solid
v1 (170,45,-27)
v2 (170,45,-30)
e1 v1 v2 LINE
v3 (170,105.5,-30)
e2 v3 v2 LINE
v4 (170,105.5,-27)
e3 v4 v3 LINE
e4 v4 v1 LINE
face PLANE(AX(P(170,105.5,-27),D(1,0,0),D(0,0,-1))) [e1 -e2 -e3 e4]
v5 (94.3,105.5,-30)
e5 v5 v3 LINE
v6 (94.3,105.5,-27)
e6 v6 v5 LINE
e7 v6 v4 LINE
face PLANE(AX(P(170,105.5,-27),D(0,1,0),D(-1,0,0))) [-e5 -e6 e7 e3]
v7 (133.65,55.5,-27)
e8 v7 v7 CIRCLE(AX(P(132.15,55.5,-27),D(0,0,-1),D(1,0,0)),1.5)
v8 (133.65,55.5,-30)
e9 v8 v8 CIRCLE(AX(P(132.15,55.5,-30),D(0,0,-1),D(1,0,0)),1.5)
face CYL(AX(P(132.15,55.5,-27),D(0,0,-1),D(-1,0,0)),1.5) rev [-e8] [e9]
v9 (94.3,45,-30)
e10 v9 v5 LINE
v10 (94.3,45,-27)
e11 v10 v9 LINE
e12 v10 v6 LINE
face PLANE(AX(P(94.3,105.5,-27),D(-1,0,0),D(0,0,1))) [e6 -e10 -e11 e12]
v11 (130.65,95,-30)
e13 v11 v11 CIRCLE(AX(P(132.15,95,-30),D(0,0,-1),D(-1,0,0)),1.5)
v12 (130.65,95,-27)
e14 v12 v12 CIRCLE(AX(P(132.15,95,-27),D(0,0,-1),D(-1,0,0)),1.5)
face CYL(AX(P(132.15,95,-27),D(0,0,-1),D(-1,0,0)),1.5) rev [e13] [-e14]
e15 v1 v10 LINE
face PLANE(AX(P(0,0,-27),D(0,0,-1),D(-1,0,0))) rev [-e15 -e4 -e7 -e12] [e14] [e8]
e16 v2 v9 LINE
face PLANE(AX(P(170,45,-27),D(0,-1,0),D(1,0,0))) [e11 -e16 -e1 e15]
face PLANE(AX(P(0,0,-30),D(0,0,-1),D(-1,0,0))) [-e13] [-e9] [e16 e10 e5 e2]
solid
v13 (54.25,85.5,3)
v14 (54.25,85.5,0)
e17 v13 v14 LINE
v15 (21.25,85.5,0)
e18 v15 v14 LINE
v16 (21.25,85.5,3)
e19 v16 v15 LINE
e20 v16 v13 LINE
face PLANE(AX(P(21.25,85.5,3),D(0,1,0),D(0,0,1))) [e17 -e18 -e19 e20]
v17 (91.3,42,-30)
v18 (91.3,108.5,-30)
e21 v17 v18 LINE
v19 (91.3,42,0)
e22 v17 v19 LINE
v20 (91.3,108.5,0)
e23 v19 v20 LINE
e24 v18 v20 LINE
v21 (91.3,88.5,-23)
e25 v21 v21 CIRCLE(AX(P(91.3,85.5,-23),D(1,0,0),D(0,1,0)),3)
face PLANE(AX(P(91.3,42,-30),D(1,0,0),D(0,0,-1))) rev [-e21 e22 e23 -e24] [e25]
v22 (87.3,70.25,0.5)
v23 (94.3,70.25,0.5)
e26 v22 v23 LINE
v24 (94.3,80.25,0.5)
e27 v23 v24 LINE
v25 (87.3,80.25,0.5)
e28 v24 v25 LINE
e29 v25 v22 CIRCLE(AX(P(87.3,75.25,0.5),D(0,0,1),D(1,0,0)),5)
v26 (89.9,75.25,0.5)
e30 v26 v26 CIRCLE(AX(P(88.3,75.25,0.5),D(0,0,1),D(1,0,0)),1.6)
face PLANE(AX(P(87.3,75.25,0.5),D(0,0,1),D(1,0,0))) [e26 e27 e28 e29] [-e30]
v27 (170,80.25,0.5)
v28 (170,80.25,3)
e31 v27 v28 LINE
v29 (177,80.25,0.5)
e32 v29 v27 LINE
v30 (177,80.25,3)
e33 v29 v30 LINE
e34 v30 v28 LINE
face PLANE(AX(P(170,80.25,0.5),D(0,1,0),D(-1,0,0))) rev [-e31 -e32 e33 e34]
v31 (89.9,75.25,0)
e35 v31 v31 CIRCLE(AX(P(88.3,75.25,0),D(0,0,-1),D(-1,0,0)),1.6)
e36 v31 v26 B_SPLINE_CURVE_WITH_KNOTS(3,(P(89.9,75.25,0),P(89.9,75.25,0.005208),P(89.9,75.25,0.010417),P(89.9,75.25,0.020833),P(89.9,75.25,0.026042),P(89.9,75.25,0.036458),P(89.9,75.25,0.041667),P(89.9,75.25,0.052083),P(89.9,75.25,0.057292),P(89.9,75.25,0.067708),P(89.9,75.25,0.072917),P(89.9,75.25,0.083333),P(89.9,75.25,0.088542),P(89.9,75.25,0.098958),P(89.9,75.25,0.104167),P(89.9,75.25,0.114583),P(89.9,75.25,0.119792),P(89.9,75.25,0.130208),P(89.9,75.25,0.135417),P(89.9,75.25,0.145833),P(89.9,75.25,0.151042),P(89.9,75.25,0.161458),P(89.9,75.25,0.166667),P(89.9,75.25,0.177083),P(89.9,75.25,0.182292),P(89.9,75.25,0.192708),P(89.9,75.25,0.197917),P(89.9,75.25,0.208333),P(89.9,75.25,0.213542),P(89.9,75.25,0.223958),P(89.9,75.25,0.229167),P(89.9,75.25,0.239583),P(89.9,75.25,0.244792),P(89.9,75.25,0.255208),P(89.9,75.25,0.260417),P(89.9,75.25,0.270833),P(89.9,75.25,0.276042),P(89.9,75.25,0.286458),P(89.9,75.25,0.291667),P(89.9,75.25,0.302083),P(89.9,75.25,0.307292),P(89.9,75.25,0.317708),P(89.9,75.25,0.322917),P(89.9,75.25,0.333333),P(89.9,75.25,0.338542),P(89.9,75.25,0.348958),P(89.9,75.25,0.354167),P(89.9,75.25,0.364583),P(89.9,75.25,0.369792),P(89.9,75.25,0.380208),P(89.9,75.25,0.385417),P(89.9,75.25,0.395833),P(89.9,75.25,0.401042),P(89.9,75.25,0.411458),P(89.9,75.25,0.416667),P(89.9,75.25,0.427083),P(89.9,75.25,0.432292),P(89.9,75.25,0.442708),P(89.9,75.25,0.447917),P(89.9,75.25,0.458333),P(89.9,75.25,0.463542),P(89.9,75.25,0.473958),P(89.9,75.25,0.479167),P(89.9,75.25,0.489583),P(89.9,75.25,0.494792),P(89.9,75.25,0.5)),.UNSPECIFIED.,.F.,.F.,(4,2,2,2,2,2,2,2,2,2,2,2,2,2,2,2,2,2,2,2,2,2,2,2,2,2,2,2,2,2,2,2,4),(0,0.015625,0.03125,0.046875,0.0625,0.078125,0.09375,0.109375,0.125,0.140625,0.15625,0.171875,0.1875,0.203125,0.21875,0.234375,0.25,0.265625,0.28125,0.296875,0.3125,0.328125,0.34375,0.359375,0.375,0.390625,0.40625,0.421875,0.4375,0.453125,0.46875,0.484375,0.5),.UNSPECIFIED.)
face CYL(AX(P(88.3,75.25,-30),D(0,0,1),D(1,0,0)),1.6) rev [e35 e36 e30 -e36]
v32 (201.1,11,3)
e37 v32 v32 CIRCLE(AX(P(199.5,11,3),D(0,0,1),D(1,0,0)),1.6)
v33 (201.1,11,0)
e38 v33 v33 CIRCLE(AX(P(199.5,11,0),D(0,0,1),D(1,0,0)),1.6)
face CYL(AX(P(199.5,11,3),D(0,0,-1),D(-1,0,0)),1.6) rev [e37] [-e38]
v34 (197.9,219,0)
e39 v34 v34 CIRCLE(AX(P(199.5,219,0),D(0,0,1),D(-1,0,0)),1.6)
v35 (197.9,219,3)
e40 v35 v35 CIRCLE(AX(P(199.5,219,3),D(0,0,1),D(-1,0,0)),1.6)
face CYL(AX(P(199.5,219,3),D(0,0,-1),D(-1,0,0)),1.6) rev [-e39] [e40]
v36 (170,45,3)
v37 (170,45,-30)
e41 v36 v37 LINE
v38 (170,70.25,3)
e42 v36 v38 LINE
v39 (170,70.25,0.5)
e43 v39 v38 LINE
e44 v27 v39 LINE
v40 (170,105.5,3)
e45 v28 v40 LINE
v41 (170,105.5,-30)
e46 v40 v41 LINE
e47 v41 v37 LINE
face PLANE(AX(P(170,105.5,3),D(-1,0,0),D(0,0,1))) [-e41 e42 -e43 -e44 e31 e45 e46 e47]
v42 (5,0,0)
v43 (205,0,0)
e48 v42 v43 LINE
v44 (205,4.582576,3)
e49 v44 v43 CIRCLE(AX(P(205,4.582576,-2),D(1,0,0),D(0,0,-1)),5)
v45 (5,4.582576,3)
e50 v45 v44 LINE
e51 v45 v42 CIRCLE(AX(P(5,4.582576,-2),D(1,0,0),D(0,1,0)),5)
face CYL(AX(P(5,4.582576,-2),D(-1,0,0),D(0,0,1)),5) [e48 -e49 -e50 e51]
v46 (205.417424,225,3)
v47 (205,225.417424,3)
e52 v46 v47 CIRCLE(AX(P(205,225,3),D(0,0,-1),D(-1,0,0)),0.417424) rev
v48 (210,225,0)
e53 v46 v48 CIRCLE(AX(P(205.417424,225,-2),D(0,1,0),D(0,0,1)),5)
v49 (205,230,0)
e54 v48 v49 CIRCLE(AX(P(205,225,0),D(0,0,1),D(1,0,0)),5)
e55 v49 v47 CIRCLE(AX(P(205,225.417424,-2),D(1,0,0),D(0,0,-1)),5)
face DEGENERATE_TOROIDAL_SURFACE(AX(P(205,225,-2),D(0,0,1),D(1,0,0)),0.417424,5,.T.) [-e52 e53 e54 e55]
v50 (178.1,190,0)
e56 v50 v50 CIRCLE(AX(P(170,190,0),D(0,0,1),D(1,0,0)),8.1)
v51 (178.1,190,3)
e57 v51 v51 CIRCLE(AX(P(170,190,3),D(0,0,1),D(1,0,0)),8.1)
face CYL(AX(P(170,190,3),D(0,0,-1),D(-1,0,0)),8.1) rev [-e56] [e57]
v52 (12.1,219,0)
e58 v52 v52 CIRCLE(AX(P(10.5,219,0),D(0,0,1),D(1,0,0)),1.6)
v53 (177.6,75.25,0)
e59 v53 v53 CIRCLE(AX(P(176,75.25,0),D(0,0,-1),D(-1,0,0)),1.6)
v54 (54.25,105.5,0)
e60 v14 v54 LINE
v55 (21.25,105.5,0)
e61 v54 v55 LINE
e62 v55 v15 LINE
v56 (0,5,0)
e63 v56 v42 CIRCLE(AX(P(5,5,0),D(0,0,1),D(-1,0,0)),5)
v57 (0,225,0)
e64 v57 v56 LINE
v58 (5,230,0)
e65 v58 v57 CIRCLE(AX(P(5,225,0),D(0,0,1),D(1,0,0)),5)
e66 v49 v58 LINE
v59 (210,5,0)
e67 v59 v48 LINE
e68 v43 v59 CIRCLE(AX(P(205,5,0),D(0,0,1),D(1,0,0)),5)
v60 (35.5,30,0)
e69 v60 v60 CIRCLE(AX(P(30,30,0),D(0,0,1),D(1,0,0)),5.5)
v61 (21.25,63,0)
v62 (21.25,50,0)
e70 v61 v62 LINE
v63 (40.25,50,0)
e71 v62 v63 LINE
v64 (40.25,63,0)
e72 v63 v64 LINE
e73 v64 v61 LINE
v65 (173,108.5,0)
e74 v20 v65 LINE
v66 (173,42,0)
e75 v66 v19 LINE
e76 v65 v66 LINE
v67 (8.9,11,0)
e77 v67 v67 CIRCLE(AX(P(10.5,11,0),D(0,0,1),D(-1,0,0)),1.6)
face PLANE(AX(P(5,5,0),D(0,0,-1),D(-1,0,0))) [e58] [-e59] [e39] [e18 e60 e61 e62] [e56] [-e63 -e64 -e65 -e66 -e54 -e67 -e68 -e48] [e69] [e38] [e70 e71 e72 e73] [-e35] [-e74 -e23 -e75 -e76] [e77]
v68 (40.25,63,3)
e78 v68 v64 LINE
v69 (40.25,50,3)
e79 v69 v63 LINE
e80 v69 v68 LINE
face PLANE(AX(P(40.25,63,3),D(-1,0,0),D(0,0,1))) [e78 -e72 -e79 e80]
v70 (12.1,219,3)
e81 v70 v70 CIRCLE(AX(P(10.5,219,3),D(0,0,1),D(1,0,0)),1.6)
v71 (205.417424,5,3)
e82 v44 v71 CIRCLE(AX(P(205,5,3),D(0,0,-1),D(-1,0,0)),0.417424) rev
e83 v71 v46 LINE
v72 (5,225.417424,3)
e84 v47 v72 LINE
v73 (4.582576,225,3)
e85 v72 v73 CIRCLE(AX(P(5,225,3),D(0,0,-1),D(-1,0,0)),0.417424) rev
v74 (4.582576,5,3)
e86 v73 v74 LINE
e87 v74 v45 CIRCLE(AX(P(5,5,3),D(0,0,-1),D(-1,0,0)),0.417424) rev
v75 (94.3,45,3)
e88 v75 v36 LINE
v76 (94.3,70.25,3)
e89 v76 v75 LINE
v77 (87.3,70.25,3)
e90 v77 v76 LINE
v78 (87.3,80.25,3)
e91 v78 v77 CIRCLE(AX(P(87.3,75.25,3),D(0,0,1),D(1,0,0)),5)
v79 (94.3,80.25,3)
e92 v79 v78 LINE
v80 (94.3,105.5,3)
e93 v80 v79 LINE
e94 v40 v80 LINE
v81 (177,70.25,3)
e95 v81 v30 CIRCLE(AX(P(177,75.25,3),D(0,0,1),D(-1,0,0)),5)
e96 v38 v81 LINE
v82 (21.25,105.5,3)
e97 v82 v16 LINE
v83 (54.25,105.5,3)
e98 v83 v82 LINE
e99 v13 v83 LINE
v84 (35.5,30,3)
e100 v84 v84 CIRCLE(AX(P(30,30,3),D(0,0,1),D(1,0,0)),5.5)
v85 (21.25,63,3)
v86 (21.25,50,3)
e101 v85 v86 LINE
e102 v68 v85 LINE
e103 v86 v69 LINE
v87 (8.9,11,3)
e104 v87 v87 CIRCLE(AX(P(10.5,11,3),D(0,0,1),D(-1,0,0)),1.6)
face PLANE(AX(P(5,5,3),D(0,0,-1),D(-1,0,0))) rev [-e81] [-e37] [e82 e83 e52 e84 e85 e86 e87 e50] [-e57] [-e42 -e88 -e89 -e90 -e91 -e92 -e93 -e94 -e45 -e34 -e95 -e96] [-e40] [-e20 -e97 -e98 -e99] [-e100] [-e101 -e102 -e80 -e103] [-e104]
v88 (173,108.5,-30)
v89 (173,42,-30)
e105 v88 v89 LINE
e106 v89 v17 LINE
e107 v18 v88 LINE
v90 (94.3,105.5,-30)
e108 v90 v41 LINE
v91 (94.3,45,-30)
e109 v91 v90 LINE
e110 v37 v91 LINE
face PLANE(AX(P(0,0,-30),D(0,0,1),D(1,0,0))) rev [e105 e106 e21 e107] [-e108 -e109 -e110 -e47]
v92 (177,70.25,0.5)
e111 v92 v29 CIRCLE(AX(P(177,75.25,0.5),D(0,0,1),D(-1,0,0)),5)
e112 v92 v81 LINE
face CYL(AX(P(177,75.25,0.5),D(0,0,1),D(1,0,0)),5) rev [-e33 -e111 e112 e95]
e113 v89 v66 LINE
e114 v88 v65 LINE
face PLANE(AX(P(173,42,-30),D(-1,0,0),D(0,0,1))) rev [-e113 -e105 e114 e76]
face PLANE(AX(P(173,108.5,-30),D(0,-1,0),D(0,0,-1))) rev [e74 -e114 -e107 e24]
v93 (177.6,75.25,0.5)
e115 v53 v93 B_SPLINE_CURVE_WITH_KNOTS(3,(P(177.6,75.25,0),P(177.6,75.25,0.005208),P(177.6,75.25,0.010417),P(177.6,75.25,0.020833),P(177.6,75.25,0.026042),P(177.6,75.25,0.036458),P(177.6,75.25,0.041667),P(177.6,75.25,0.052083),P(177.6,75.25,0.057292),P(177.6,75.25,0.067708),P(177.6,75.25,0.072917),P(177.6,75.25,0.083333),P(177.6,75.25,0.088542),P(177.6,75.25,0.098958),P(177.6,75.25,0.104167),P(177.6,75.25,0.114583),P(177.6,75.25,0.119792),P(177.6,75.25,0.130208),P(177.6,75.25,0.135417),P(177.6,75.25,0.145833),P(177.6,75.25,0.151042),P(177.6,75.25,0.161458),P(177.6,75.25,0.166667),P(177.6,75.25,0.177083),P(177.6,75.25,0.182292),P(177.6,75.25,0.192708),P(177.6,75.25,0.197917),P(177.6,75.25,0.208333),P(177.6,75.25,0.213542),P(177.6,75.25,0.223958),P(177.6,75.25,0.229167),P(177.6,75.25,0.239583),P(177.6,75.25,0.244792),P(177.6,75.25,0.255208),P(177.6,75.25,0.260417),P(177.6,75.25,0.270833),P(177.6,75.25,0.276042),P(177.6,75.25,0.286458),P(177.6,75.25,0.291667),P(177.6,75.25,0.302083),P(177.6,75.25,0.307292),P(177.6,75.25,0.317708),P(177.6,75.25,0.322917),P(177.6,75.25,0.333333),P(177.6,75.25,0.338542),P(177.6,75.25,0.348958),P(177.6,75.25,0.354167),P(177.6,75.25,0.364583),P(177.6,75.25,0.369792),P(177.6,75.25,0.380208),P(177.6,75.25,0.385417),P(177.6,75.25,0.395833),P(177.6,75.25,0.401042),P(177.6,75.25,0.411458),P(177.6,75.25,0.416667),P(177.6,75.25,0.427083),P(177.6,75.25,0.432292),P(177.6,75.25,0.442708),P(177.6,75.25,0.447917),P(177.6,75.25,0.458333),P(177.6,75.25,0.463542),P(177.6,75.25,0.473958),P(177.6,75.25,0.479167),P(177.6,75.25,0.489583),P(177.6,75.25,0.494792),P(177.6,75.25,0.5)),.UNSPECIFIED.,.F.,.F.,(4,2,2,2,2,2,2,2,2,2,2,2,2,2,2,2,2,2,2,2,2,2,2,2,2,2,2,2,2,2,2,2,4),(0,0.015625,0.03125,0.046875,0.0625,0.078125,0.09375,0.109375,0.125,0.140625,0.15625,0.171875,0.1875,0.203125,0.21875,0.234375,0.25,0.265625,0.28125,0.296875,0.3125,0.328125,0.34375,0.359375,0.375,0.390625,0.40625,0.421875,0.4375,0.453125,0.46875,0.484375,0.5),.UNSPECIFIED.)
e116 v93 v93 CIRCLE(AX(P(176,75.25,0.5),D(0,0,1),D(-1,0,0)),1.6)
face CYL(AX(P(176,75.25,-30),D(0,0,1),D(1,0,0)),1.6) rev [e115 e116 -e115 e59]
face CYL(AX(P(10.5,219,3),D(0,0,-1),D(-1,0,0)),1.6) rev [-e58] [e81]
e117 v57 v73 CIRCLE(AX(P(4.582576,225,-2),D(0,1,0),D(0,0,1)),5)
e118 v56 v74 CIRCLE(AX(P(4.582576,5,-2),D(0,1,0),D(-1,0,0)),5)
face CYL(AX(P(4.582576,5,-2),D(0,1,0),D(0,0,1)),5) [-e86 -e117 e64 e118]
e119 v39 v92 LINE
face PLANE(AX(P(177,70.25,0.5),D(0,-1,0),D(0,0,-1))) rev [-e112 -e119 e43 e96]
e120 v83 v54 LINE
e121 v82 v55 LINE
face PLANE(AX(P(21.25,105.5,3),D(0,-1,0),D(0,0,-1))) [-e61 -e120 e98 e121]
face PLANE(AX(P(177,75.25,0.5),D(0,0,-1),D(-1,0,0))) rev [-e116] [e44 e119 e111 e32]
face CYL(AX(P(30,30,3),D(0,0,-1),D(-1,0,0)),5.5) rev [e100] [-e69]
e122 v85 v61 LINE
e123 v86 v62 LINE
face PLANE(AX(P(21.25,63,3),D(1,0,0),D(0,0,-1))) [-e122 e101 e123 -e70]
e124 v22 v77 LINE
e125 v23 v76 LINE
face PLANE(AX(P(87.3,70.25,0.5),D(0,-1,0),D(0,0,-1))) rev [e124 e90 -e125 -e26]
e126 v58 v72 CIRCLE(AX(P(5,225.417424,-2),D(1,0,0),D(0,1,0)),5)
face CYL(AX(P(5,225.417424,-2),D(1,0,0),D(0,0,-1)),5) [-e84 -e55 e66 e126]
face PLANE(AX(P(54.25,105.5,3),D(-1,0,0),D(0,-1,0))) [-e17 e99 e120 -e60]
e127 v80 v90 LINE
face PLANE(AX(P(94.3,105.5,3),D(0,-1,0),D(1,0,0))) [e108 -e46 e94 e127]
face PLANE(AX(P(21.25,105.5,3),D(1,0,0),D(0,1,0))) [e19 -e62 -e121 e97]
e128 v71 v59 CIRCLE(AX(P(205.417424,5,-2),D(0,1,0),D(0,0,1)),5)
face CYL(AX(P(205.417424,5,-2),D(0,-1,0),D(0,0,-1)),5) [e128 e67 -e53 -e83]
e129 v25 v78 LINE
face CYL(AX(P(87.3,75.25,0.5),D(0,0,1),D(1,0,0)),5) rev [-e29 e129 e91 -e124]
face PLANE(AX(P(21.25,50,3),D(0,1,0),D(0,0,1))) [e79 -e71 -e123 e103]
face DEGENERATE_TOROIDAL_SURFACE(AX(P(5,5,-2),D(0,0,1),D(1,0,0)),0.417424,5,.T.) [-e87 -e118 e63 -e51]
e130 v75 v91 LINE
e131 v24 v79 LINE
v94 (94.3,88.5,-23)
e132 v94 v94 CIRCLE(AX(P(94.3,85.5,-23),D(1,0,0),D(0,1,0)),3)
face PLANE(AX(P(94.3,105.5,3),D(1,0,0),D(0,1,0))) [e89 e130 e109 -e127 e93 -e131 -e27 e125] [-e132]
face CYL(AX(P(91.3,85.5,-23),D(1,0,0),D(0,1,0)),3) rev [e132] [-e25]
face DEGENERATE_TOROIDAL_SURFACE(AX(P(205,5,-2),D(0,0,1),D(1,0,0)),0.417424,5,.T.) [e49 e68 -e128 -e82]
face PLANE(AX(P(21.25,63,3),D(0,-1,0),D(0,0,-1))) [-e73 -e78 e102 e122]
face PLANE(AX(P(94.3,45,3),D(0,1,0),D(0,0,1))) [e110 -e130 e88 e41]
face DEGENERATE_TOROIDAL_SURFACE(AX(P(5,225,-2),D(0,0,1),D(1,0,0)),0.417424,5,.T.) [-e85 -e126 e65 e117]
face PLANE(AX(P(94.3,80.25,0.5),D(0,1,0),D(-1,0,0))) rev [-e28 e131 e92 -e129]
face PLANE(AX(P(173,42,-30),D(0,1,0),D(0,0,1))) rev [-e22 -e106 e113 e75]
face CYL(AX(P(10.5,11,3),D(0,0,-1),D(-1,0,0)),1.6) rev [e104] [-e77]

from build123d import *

# Parameters (mm, degrees)
SKETCH1_R           = 1.6
SKETCH1_R_2         = 8.1
SKETCH1_R_3         = 5.5
SKETCH1_W           = 19
SKETCH1_H           = 13
SKETCH1_W_2         = 75.7
SKETCH1_H_2         = 60.5
SKETCH1_W_3         = 33
SKETCH1_H_3         = 20
BOSS_EXTRUDE1_DEPTH = 3
SKETCH2_W           = 81.7
SKETCH2_H           = 66.5
SKETCH2_W_2         = 75.7
SKETCH2_H_2         = 60.5
BOSS_EXTRUDE2_DEPTH = 30
SKETCH3_W           = 75.7
SKETCH3_H           = 60.5
SKETCH3_R           = 1.5
BOSS_EXTRUDE3_DEPTH = 3
SKETCH4_R           = 3
CUT_EXTRUDE1_DEPTH  = 3
FILLET1_R           = 5
CUT_EXTRUDE2_DEPTH  = 2.5
SKETCH6_R           = 1.6
CUT_EXTRUDE3_DEPTH  = 313.938092919


with BuildPart() as part:
    # Sketch1 → Boss-Extrude1 (new body)
    with BuildSketch(Plane.XY):
        with BuildLine():
            Line((5, 0), (205, 0))
            ThreePointArc((205, 0), (208.535533906, 1.464466094), (210, 5))
            Line((210, 5), (210, 225))
            ThreePointArc((210, 225), (208.535533906, 228.535533906), (205, 230))
            Line((205, 230), (5, 230))
            ThreePointArc((5, 230), (1.464466094, 228.535533906), (0, 225))
            Line((0, 225), (0, 5))
            ThreePointArc((0, 5), (1.464466094, 1.464466094), (5, 0))
        make_face()
        with Locations((10.5, 219)):
            Circle(SKETCH1_R, mode=Mode.SUBTRACT)
        with Locations(Location((10.5, 11, 0), (0, 0, 180))):
            Circle(SKETCH1_R, mode=Mode.SUBTRACT)
        with Locations((199.5, 11)):
            Circle(SKETCH1_R, mode=Mode.SUBTRACT)
        with Locations(Location((199.5, 219, 0), (0, 0, 180))):
            Circle(SKETCH1_R, mode=Mode.SUBTRACT)
        with Locations((170, 190)):
            Circle(SKETCH1_R_2, mode=Mode.SUBTRACT)
        with Locations((30, 30)):
            Circle(SKETCH1_R_3, mode=Mode.SUBTRACT)
        with Locations((30.75, 56.5)):
            Rectangle(SKETCH1_W, SKETCH1_H, mode=Mode.SUBTRACT)
        with Locations((132.15, 75.25)):
            Rectangle(SKETCH1_W_2, SKETCH1_H_2, mode=Mode.SUBTRACT)
        with Locations((37.75, 95.5)):
            Rectangle(SKETCH1_W_3, SKETCH1_H_3, mode=Mode.SUBTRACT)
    extrude(amount=BOSS_EXTRUDE1_DEPTH)

    # Sketch2 → Boss-Extrude2 (add)
    with BuildSketch(Plane(origin=(0, 0, 0), x_dir=(-1, 0, 0), z_dir=(0, 0, -1))):
        with Locations((-132.15, 75.25)):
            Rectangle(SKETCH2_W, SKETCH2_H)
        with Locations((-132.15, 75.25)):
            Rectangle(SKETCH2_W_2, SKETCH2_H_2, mode=Mode.SUBTRACT)
    extrude(amount=BOSS_EXTRUDE2_DEPTH)

    # Sketch4 → Cut-Extrude1 (cut)
    with BuildSketch(Plane(origin=(94.3, 0, 0), x_dir=(0, 0, -1), z_dir=(1, 0, 0))):
        with Locations(Location((23, 85.5, 0), (0, 0, 90))):
            Circle(SKETCH4_R)
    extrude(amount=-CUT_EXTRUDE1_DEPTH, mode=Mode.SUBTRACT)

    # Fillet1
    # the kernel refuses this fillet: 5 mm, written as the material it takes off along each edge
    with BuildSketch(Plane(origin=(205, 225, 3), x_dir=(1, 0, 0), z_dir=(0, -1, 0))) as fillet1_piece_1:
        with BuildLine():
            CenterArc((0.417424305, -5), FILLET1_R, 23.578178478, 66.421821522)
            Line((5, -3), (5.091651514, -2.96))
            ThreePointArc((5.091651514, -2.96), (5.1, -1.5), (5.1, 0))
            Line((5.1, 0), (5, 0.1))
            Line((5, 0.1), (0.417424305, 0.1))
            Line((0.417424305, 0.1), (0.417424305, 0))
        make_face()
    revolve(axis=Axis((205, 225, 3), (0, 0, 1)), revolution_arc=90, mode=Mode.SUBTRACT)
    with BuildSketch(Plane(origin=(210, 5, 3), x_dir=(-1, 0, 0), z_dir=(0, 1, 0))) as fillet1_piece_2:
        with BuildLine():
            CenterArc((4.582575695, -5), FILLET1_R, 90, 66.421821522)
            Line((0, -3), (-0.091651514, -2.96))
            ThreePointArc((-0.091651514, -2.96), (-0.1, -1.5), (-0.1, 0))
            Line((-0.1, 0), (0, 0.1))
            Line((0, 0.1), (4.582575695, 0.1))
            Line((4.582575695, 0.1), (4.582575695, 0))
        make_face()
    extrude(amount=220, mode=Mode.SUBTRACT)
    with BuildSketch(Plane(origin=(205, 5, 3), x_dir=(0, -1, 0), z_dir=(-1, 0, 0))) as fillet1_piece_3:
        with BuildLine():
            CenterArc((0.417424305, -5), FILLET1_R, 23.578178478, 66.421821522)
            Line((5, -3), (5.091651514, -2.96))
            ThreePointArc((5.091651514, -2.96), (5.1, -1.5), (5.1, 0))
            Line((5.1, 0), (5, 0.1))
            Line((5, 0.1), (0.417424305, 0.1))
            Line((0.417424305, 0.1), (0.417424305, 0))
        make_face()
    revolve(axis=Axis((205, 5, 3), (0, 0, 1)), revolution_arc=90, mode=Mode.SUBTRACT)
    with BuildSketch(Plane(origin=(5, 0, 3), x_dir=(0, 1, 0), z_dir=(1, 0, 0)), Plane(origin=(205, 230, 3), x_dir=(0, -1, 0), z_dir=(-1, 0, 0))) as fillet1_piece_4:
        with BuildLine():
            CenterArc((4.582575695, -5), FILLET1_R, 90, 66.421821522)
            Line((0, -3), (-0.091651514, -2.96))
            ThreePointArc((-0.091651514, -2.96), (-0.1, -1.5), (-0.1, 0))
            Line((-0.1, 0), (0, 0.1))
            Line((0, 0.1), (4.582575695, 0.1))
            Line((4.582575695, 0.1), (4.582575695, 0))
        make_face()
    extrude(amount=200, mode=Mode.SUBTRACT)
    with BuildSketch(Plane(origin=(5, 5, 3), x_dir=(-1, 0, 0), z_dir=(0, 1, 0))) as fillet1_piece_5:
        with BuildLine():
            CenterArc((0.417424305, -5), FILLET1_R, 23.578178478, 66.421821522)
            Line((0.417424305, 0), (0.417424305, 0.1))
            Line((0.417424305, 0.1), (5, 0.1))
            Line((5, 0.1), (5.1, 0))
            ThreePointArc((5.1, 0), (5.1, -1.5), (5.091651514, -2.96))
            Line((5.091651514, -2.96), (5, -3))
        make_face()
    revolve(axis=Axis((5, 5, 3), (0, 0, 1)), revolution_arc=90, mode=Mode.SUBTRACT)
    with BuildSketch(Plane(origin=(0, 225, 3), x_dir=(0, 0, -1), z_dir=(0, -1, 0))) as fillet1_piece_6:
        with BuildLine():
            CenterArc((5, 4.582575695), FILLET1_R, 180, 66.421821522)
            Line((0, 4.582575695), (-0.1, 4.582575695))
            Line((-0.1, 4.582575695), (-0.1, 0))
            Line((-0.1, 0), (0, -0.1))
            ThreePointArc((0, -0.1), (1.5, -0.1), (2.96, -0.091651514))
            Line((2.96, -0.091651514), (3, 0))
        make_face()
    extrude(amount=220, mode=Mode.SUBTRACT)
    with BuildSketch(Plane(origin=(5, 225, 3), x_dir=(0, 1, 0), z_dir=(1, 0, 0))) as fillet1_piece_7:
        with BuildLine():
            CenterArc((0.417424305, -5), FILLET1_R, 23.578178478, 66.421821522)
            Line((0.417424305, 0), (0.417424305, 0.1))
            Line((0.417424305, 0.1), (5, 0.1))
            Line((5, 0.1), (5.1, 0))
            ThreePointArc((5.1, 0), (5.1, -1.5), (5.091651514, -2.96))
            Line((5.091651514, -2.96), (5, -3))
        make_face()
    revolve(axis=Axis((5, 225, 3), (0, 0, 1)), revolution_arc=90, mode=Mode.SUBTRACT)

    # Sketch5 → Cut-Extrude2 (cut)
    with BuildSketch(Plane.XY.offset(3)):
        with BuildLine():
            Line((94.3, 80.25), (87.3, 80.25))
            ThreePointArc((87.3, 80.25), (82.3, 75.25), (87.3, 70.25))
            Line((87.3, 70.25), (94.3, 70.25))
            Line((94.3, 70.25), (94.3, 80.25))
        make_face()
        with BuildLine():
            Line((170, 80.25), (177, 80.25))
            ThreePointArc((177, 80.25), (182, 75.25), (177, 70.25))
            Line((177, 70.25), (170, 70.25))
            Line((170, 70.25), (170, 80.25))
        make_face()
    extrude(amount=-CUT_EXTRUDE2_DEPTH, mode=Mode.SUBTRACT)

    # Sketch6 → Cut-Extrude3 (cut, through all)
    with BuildSketch(Plane.XY.offset(0.5)):
        with Locations((88.3, 75.25)):
            Circle(SKETCH6_R)
        with Locations((176, 75.25)):
            Circle(SKETCH6_R)
    extrude(amount=-CUT_EXTRUDE3_DEPTH, mode=Mode.SUBTRACT)


with BuildPart() as body_2:
    # Sketch3 → Boss-Extrude3 (new body)
    with BuildSketch(Plane(origin=(0, 0, -30), x_dir=(-1, 0, 0), z_dir=(0, 0, -1))):
        with Locations((-132.15, 75.25)):
            Rectangle(SKETCH3_W, SKETCH3_H)
        with Locations((-132.15, 95)):
            Circle(SKETCH3_R, mode=Mode.SUBTRACT)
        with Locations(Location((-132.15, 55.5, 0), (0, 0, 180))):
            Circle(SKETCH3_R, mode=Mode.SUBTRACT)
    extrude(amount=-BOSS_EXTRUDE3_DEPTH)


solid = Compound([part.part, body_2.part])
